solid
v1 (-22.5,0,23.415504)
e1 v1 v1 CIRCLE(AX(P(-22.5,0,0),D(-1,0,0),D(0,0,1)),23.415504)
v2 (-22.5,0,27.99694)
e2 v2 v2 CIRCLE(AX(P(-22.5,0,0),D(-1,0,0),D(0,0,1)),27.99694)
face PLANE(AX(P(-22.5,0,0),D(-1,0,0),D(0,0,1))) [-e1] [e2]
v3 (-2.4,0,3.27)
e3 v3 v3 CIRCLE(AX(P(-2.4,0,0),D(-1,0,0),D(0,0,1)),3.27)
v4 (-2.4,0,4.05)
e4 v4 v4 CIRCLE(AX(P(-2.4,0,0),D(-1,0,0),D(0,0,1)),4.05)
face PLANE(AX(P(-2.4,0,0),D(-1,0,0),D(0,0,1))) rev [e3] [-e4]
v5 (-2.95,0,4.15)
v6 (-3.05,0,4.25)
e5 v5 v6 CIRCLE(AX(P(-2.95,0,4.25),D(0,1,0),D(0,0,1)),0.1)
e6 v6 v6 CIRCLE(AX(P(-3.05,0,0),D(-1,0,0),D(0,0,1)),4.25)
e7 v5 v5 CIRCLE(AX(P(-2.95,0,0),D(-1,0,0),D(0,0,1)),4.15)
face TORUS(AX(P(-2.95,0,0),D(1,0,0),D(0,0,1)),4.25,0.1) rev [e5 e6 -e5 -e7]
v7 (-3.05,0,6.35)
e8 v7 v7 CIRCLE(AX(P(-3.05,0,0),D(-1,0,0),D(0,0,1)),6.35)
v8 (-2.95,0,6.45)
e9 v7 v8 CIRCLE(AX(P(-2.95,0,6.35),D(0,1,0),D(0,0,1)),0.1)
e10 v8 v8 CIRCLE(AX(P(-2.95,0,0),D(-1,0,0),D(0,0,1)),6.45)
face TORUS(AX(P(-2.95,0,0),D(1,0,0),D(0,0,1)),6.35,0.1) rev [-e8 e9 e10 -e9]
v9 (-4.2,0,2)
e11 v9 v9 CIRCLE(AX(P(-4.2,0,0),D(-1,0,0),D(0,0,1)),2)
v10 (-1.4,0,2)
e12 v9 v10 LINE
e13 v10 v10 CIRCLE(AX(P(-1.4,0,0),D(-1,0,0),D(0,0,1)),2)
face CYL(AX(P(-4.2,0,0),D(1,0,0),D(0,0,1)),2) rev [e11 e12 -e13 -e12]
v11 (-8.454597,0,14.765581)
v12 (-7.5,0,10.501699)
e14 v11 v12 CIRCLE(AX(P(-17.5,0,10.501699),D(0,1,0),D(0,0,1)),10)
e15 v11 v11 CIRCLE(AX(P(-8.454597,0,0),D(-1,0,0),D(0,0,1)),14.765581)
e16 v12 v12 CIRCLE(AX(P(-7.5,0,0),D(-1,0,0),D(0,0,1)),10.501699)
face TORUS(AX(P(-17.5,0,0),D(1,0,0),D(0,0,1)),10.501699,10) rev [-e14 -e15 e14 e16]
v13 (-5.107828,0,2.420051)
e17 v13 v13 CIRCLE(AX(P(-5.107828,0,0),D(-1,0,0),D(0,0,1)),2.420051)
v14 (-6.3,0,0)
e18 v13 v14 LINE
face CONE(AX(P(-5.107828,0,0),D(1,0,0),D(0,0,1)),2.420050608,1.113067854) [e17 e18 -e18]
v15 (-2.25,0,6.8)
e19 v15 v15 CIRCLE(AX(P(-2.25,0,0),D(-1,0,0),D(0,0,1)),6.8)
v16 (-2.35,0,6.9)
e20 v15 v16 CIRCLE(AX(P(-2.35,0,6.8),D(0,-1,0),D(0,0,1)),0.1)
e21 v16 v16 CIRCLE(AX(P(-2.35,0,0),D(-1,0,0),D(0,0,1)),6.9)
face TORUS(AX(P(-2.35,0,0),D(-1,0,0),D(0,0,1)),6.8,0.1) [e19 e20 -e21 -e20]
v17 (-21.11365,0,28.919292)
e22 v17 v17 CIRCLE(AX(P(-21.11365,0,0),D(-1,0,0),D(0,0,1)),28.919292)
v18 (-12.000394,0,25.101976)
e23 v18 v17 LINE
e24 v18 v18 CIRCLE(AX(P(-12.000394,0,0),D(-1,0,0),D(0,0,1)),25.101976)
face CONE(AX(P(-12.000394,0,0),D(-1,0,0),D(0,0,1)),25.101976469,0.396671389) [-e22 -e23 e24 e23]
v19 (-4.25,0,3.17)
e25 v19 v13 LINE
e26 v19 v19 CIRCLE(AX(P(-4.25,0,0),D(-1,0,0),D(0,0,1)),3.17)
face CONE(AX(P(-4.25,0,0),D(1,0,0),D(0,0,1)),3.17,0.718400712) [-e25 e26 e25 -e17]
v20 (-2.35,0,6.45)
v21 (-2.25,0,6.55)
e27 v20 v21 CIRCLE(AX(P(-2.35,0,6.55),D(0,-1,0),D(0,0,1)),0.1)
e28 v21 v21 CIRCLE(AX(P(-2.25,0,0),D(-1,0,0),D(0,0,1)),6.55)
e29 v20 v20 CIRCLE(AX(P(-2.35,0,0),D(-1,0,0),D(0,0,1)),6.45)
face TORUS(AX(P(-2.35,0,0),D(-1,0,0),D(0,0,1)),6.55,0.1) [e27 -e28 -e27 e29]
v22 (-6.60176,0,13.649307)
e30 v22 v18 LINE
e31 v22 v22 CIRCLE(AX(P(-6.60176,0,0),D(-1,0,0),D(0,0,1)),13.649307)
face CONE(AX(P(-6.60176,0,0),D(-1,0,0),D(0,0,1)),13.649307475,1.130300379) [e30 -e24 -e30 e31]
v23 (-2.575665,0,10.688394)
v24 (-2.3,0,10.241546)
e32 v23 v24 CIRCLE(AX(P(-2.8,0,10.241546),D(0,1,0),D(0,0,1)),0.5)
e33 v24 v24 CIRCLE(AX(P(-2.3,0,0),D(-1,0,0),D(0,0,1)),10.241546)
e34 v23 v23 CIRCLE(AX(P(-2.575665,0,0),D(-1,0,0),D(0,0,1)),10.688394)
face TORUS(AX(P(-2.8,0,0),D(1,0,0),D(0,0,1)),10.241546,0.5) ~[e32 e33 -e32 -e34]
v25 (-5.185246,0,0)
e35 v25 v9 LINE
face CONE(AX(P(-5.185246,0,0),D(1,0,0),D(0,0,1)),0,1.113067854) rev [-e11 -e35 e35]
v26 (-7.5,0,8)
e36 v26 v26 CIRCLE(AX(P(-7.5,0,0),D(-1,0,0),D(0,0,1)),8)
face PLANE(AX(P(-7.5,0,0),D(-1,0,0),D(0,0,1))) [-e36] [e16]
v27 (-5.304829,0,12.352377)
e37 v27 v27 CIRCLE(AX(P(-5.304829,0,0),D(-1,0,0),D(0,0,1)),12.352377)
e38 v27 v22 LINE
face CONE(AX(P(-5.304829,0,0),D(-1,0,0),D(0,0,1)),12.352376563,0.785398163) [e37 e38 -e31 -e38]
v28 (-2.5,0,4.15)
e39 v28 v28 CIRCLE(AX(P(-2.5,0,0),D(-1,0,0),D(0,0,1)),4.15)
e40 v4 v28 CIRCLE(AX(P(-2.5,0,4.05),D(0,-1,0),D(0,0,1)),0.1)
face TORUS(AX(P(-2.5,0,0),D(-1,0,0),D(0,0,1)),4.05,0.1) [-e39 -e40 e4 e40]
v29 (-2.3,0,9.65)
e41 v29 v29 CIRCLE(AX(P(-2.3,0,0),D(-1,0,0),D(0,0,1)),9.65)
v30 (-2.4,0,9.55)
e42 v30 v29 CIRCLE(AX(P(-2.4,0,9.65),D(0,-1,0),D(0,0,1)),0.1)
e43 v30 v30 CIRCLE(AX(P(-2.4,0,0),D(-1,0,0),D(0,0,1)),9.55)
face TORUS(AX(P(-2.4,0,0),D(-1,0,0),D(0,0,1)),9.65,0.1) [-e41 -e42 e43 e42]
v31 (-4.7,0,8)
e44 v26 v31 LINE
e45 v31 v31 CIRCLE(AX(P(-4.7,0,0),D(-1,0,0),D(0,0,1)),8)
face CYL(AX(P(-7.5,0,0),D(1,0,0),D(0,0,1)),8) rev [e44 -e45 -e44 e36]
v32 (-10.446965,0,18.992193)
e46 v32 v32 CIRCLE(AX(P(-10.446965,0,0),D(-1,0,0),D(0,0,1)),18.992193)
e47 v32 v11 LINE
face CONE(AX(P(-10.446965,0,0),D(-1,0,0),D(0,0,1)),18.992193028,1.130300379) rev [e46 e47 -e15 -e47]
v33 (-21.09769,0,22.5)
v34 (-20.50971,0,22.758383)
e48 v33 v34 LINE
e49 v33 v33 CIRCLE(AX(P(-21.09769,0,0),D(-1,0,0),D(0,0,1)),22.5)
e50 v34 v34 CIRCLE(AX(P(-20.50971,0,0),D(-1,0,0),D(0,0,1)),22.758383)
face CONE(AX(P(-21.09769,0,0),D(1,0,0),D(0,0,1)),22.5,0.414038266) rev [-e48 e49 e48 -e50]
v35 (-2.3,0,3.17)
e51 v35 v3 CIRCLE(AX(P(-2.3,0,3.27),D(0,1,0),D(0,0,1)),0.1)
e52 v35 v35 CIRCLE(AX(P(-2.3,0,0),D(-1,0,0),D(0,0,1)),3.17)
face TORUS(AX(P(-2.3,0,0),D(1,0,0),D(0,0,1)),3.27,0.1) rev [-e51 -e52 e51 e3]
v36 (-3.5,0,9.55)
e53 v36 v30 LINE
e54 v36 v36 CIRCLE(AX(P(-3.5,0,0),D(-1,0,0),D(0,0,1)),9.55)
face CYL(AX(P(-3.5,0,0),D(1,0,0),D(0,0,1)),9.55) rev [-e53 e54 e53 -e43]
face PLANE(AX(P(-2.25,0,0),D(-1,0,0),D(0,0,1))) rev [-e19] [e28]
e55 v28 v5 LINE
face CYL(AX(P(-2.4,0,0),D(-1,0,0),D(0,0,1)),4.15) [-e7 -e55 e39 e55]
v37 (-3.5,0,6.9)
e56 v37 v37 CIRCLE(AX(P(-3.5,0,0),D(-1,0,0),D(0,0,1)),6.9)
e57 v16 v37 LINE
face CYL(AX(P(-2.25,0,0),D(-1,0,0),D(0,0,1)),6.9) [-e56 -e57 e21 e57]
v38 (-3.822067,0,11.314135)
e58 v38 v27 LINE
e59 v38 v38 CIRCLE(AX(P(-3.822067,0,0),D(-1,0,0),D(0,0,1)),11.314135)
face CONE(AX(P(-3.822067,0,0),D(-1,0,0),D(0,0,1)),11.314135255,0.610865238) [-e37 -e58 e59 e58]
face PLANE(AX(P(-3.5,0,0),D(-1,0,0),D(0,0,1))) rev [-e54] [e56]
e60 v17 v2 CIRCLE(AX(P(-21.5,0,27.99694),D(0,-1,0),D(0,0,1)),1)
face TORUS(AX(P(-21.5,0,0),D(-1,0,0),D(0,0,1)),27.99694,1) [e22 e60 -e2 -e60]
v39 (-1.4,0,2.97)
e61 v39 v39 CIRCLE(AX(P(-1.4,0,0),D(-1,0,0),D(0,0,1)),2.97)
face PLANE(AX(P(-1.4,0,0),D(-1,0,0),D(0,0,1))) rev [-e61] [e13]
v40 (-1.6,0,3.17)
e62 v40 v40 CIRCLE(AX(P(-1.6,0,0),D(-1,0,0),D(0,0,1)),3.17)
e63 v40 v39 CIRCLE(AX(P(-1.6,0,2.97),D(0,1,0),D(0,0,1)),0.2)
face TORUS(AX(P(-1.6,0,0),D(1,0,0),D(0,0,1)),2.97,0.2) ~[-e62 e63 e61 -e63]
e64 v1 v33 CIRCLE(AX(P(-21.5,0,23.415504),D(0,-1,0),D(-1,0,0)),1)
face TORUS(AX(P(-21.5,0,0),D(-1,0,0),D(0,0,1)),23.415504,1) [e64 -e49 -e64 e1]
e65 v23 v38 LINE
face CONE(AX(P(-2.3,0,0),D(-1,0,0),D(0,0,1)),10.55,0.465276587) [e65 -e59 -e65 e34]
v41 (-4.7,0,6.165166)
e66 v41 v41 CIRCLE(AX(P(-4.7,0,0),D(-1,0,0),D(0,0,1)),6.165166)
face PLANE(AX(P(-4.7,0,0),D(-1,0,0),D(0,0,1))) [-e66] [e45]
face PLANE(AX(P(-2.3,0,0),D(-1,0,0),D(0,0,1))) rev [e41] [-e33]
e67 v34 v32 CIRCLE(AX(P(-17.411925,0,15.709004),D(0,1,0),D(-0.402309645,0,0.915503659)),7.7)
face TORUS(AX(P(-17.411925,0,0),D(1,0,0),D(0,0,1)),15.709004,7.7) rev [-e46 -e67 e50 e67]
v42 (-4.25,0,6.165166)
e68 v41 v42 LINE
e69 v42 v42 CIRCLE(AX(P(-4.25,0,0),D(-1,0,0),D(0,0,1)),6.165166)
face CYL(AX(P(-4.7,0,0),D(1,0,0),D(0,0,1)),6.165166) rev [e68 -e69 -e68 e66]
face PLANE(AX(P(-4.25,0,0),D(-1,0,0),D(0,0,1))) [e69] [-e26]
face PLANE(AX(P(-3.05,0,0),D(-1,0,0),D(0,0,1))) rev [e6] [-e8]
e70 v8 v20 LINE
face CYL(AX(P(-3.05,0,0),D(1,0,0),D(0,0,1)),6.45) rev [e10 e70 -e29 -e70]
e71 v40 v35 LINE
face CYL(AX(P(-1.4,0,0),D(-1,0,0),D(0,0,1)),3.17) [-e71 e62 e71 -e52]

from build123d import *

# Parameters (mm, degrees)
F2_R = 0.1
F3_R = 0.2
F4_R = 1
F5_R = 10
F6_R = 0.5


with BuildPart() as f1:
    # F0 (on Front) → F1 (revolve)
    with BuildSketch(Plane.XZ):
        with BuildLine():
            Line((-4.2, 2), (-1.4, 2))
            Line((-1.4, 2), (-1.4, 3.17))
            Line((-1.4, 3.17), (-2.4, 3.17))
            Line((-2.4, 3.17), (-2.4, 4.15))
            Line((-2.4, 4.15), (-3.05, 4.15))
            Line((-3.05, 4.15), (-3.05, 6.45))
            Line((-3.05, 6.45), (-2.25, 6.45))
            Line((-2.25, 6.45), (-2.25, 6.9))
            Line((-2.25, 6.9), (-3.5, 6.9))
            Line((-3.5, 6.9), (-3.5, 9.55))
            Line((-3.5, 9.55), (-2.3, 9.55))
            Line((-2.3, 9.55), (-2.3, 10.55))
            Line((-2.3, 10.55), (-3.8220669191, 11.3141352547))
            Line((-3.8220669191, 11.3141352547), (-5.3048291735, 12.3523765626))
            Line((-5.3048291735, 12.3523765626), (-6.6017600859, 13.649307475))
            Line((-6.6017600859, 13.649307475), (-12.0003940538, 25.1019764692))
            Line((-12.0003940538, 25.1019764692), (-22.5, 29.5))
            Line((-22.5, 29.5), (-22.5, 23.4155036587))
            ThreePointArc((-22.5, 23.4155036587), (-22.0466673369, 22.578153778), (-21.0976903546, 22.5))
            Line((-21.0976903546, 22.5), (-20.5097097557, 22.7583826553))
            ThreePointArc((-20.5097097557, 22.7583826553), (-14.712886985, 22.9204669678), (-10.446965114, 18.9921930276))
            Line((-10.446965114, 18.9921930276), (-7.5, 12.7404974711))
            Line((-7.5, 12.7404974711), (-7.5, 8))
            Line((-7.5, 8), (-4.7, 8))
            Line((-4.7, 8), (-4.7, 6.1651659198))
            Line((-4.7, 6.1651659198), (-4.25, 6.1651659198))
            Line((-4.25, 6.1651659198), (-4.25, 3.17))
            Line((-4.25, 3.17), (-5.1078278272, 2.4200506077))
            Line((-5.1078278272, 2.4200506077), (-6.3, 0))
            Line((-6.3, 0), (-5.1852456548, 0))
            Line((-5.1852456548, 0), (-4.2, 2))
        make_face()
    revolve(axis=Axis((-5.7426228274, 0, 0), (-1, 0, 0)))

    # F2
    f2_edges = [f1.edges().sort_by_distance(p)[0] for p in [
        (-2.4, 0, -4.15),
        (-3.05, 0, -4.15),
        (-2.25, 0, -6.45),
        (-2.25, 0, -6.9),
        (-2.3, 0, -9.55),
        (-3.05, 0, -6.45),
        (-2.4, 0, -3.17),
    ]]
    fillet(f2_edges, radius=F2_R)

    # F3
    f3_edges = [f1.edges().sort_by_distance(p)[0] for p in [
        (-1.4, 0, -3.17),
    ]]
    fillet(f3_edges, radius=F3_R)

    # F4
    f4_edges = [f1.edges().sort_by_distance(p)[0] for p in [
        (-22.5, 0, -29.5),
    ]]
    fillet(f4_edges, radius=F4_R)

    # F5
    f5_edges = [f1.edges().sort_by_distance(p)[0] for p in [
        (-7.5, 0, -12.740497),
    ]]
    fillet(f5_edges, radius=F5_R)

    # F6
    f6_edges = [f1.edges().sort_by_distance(p)[0] for p in [
        (-2.3, 0, -10.55),
    ]]
    fillet(f6_edges, radius=F6_R)


solid = f1.part
